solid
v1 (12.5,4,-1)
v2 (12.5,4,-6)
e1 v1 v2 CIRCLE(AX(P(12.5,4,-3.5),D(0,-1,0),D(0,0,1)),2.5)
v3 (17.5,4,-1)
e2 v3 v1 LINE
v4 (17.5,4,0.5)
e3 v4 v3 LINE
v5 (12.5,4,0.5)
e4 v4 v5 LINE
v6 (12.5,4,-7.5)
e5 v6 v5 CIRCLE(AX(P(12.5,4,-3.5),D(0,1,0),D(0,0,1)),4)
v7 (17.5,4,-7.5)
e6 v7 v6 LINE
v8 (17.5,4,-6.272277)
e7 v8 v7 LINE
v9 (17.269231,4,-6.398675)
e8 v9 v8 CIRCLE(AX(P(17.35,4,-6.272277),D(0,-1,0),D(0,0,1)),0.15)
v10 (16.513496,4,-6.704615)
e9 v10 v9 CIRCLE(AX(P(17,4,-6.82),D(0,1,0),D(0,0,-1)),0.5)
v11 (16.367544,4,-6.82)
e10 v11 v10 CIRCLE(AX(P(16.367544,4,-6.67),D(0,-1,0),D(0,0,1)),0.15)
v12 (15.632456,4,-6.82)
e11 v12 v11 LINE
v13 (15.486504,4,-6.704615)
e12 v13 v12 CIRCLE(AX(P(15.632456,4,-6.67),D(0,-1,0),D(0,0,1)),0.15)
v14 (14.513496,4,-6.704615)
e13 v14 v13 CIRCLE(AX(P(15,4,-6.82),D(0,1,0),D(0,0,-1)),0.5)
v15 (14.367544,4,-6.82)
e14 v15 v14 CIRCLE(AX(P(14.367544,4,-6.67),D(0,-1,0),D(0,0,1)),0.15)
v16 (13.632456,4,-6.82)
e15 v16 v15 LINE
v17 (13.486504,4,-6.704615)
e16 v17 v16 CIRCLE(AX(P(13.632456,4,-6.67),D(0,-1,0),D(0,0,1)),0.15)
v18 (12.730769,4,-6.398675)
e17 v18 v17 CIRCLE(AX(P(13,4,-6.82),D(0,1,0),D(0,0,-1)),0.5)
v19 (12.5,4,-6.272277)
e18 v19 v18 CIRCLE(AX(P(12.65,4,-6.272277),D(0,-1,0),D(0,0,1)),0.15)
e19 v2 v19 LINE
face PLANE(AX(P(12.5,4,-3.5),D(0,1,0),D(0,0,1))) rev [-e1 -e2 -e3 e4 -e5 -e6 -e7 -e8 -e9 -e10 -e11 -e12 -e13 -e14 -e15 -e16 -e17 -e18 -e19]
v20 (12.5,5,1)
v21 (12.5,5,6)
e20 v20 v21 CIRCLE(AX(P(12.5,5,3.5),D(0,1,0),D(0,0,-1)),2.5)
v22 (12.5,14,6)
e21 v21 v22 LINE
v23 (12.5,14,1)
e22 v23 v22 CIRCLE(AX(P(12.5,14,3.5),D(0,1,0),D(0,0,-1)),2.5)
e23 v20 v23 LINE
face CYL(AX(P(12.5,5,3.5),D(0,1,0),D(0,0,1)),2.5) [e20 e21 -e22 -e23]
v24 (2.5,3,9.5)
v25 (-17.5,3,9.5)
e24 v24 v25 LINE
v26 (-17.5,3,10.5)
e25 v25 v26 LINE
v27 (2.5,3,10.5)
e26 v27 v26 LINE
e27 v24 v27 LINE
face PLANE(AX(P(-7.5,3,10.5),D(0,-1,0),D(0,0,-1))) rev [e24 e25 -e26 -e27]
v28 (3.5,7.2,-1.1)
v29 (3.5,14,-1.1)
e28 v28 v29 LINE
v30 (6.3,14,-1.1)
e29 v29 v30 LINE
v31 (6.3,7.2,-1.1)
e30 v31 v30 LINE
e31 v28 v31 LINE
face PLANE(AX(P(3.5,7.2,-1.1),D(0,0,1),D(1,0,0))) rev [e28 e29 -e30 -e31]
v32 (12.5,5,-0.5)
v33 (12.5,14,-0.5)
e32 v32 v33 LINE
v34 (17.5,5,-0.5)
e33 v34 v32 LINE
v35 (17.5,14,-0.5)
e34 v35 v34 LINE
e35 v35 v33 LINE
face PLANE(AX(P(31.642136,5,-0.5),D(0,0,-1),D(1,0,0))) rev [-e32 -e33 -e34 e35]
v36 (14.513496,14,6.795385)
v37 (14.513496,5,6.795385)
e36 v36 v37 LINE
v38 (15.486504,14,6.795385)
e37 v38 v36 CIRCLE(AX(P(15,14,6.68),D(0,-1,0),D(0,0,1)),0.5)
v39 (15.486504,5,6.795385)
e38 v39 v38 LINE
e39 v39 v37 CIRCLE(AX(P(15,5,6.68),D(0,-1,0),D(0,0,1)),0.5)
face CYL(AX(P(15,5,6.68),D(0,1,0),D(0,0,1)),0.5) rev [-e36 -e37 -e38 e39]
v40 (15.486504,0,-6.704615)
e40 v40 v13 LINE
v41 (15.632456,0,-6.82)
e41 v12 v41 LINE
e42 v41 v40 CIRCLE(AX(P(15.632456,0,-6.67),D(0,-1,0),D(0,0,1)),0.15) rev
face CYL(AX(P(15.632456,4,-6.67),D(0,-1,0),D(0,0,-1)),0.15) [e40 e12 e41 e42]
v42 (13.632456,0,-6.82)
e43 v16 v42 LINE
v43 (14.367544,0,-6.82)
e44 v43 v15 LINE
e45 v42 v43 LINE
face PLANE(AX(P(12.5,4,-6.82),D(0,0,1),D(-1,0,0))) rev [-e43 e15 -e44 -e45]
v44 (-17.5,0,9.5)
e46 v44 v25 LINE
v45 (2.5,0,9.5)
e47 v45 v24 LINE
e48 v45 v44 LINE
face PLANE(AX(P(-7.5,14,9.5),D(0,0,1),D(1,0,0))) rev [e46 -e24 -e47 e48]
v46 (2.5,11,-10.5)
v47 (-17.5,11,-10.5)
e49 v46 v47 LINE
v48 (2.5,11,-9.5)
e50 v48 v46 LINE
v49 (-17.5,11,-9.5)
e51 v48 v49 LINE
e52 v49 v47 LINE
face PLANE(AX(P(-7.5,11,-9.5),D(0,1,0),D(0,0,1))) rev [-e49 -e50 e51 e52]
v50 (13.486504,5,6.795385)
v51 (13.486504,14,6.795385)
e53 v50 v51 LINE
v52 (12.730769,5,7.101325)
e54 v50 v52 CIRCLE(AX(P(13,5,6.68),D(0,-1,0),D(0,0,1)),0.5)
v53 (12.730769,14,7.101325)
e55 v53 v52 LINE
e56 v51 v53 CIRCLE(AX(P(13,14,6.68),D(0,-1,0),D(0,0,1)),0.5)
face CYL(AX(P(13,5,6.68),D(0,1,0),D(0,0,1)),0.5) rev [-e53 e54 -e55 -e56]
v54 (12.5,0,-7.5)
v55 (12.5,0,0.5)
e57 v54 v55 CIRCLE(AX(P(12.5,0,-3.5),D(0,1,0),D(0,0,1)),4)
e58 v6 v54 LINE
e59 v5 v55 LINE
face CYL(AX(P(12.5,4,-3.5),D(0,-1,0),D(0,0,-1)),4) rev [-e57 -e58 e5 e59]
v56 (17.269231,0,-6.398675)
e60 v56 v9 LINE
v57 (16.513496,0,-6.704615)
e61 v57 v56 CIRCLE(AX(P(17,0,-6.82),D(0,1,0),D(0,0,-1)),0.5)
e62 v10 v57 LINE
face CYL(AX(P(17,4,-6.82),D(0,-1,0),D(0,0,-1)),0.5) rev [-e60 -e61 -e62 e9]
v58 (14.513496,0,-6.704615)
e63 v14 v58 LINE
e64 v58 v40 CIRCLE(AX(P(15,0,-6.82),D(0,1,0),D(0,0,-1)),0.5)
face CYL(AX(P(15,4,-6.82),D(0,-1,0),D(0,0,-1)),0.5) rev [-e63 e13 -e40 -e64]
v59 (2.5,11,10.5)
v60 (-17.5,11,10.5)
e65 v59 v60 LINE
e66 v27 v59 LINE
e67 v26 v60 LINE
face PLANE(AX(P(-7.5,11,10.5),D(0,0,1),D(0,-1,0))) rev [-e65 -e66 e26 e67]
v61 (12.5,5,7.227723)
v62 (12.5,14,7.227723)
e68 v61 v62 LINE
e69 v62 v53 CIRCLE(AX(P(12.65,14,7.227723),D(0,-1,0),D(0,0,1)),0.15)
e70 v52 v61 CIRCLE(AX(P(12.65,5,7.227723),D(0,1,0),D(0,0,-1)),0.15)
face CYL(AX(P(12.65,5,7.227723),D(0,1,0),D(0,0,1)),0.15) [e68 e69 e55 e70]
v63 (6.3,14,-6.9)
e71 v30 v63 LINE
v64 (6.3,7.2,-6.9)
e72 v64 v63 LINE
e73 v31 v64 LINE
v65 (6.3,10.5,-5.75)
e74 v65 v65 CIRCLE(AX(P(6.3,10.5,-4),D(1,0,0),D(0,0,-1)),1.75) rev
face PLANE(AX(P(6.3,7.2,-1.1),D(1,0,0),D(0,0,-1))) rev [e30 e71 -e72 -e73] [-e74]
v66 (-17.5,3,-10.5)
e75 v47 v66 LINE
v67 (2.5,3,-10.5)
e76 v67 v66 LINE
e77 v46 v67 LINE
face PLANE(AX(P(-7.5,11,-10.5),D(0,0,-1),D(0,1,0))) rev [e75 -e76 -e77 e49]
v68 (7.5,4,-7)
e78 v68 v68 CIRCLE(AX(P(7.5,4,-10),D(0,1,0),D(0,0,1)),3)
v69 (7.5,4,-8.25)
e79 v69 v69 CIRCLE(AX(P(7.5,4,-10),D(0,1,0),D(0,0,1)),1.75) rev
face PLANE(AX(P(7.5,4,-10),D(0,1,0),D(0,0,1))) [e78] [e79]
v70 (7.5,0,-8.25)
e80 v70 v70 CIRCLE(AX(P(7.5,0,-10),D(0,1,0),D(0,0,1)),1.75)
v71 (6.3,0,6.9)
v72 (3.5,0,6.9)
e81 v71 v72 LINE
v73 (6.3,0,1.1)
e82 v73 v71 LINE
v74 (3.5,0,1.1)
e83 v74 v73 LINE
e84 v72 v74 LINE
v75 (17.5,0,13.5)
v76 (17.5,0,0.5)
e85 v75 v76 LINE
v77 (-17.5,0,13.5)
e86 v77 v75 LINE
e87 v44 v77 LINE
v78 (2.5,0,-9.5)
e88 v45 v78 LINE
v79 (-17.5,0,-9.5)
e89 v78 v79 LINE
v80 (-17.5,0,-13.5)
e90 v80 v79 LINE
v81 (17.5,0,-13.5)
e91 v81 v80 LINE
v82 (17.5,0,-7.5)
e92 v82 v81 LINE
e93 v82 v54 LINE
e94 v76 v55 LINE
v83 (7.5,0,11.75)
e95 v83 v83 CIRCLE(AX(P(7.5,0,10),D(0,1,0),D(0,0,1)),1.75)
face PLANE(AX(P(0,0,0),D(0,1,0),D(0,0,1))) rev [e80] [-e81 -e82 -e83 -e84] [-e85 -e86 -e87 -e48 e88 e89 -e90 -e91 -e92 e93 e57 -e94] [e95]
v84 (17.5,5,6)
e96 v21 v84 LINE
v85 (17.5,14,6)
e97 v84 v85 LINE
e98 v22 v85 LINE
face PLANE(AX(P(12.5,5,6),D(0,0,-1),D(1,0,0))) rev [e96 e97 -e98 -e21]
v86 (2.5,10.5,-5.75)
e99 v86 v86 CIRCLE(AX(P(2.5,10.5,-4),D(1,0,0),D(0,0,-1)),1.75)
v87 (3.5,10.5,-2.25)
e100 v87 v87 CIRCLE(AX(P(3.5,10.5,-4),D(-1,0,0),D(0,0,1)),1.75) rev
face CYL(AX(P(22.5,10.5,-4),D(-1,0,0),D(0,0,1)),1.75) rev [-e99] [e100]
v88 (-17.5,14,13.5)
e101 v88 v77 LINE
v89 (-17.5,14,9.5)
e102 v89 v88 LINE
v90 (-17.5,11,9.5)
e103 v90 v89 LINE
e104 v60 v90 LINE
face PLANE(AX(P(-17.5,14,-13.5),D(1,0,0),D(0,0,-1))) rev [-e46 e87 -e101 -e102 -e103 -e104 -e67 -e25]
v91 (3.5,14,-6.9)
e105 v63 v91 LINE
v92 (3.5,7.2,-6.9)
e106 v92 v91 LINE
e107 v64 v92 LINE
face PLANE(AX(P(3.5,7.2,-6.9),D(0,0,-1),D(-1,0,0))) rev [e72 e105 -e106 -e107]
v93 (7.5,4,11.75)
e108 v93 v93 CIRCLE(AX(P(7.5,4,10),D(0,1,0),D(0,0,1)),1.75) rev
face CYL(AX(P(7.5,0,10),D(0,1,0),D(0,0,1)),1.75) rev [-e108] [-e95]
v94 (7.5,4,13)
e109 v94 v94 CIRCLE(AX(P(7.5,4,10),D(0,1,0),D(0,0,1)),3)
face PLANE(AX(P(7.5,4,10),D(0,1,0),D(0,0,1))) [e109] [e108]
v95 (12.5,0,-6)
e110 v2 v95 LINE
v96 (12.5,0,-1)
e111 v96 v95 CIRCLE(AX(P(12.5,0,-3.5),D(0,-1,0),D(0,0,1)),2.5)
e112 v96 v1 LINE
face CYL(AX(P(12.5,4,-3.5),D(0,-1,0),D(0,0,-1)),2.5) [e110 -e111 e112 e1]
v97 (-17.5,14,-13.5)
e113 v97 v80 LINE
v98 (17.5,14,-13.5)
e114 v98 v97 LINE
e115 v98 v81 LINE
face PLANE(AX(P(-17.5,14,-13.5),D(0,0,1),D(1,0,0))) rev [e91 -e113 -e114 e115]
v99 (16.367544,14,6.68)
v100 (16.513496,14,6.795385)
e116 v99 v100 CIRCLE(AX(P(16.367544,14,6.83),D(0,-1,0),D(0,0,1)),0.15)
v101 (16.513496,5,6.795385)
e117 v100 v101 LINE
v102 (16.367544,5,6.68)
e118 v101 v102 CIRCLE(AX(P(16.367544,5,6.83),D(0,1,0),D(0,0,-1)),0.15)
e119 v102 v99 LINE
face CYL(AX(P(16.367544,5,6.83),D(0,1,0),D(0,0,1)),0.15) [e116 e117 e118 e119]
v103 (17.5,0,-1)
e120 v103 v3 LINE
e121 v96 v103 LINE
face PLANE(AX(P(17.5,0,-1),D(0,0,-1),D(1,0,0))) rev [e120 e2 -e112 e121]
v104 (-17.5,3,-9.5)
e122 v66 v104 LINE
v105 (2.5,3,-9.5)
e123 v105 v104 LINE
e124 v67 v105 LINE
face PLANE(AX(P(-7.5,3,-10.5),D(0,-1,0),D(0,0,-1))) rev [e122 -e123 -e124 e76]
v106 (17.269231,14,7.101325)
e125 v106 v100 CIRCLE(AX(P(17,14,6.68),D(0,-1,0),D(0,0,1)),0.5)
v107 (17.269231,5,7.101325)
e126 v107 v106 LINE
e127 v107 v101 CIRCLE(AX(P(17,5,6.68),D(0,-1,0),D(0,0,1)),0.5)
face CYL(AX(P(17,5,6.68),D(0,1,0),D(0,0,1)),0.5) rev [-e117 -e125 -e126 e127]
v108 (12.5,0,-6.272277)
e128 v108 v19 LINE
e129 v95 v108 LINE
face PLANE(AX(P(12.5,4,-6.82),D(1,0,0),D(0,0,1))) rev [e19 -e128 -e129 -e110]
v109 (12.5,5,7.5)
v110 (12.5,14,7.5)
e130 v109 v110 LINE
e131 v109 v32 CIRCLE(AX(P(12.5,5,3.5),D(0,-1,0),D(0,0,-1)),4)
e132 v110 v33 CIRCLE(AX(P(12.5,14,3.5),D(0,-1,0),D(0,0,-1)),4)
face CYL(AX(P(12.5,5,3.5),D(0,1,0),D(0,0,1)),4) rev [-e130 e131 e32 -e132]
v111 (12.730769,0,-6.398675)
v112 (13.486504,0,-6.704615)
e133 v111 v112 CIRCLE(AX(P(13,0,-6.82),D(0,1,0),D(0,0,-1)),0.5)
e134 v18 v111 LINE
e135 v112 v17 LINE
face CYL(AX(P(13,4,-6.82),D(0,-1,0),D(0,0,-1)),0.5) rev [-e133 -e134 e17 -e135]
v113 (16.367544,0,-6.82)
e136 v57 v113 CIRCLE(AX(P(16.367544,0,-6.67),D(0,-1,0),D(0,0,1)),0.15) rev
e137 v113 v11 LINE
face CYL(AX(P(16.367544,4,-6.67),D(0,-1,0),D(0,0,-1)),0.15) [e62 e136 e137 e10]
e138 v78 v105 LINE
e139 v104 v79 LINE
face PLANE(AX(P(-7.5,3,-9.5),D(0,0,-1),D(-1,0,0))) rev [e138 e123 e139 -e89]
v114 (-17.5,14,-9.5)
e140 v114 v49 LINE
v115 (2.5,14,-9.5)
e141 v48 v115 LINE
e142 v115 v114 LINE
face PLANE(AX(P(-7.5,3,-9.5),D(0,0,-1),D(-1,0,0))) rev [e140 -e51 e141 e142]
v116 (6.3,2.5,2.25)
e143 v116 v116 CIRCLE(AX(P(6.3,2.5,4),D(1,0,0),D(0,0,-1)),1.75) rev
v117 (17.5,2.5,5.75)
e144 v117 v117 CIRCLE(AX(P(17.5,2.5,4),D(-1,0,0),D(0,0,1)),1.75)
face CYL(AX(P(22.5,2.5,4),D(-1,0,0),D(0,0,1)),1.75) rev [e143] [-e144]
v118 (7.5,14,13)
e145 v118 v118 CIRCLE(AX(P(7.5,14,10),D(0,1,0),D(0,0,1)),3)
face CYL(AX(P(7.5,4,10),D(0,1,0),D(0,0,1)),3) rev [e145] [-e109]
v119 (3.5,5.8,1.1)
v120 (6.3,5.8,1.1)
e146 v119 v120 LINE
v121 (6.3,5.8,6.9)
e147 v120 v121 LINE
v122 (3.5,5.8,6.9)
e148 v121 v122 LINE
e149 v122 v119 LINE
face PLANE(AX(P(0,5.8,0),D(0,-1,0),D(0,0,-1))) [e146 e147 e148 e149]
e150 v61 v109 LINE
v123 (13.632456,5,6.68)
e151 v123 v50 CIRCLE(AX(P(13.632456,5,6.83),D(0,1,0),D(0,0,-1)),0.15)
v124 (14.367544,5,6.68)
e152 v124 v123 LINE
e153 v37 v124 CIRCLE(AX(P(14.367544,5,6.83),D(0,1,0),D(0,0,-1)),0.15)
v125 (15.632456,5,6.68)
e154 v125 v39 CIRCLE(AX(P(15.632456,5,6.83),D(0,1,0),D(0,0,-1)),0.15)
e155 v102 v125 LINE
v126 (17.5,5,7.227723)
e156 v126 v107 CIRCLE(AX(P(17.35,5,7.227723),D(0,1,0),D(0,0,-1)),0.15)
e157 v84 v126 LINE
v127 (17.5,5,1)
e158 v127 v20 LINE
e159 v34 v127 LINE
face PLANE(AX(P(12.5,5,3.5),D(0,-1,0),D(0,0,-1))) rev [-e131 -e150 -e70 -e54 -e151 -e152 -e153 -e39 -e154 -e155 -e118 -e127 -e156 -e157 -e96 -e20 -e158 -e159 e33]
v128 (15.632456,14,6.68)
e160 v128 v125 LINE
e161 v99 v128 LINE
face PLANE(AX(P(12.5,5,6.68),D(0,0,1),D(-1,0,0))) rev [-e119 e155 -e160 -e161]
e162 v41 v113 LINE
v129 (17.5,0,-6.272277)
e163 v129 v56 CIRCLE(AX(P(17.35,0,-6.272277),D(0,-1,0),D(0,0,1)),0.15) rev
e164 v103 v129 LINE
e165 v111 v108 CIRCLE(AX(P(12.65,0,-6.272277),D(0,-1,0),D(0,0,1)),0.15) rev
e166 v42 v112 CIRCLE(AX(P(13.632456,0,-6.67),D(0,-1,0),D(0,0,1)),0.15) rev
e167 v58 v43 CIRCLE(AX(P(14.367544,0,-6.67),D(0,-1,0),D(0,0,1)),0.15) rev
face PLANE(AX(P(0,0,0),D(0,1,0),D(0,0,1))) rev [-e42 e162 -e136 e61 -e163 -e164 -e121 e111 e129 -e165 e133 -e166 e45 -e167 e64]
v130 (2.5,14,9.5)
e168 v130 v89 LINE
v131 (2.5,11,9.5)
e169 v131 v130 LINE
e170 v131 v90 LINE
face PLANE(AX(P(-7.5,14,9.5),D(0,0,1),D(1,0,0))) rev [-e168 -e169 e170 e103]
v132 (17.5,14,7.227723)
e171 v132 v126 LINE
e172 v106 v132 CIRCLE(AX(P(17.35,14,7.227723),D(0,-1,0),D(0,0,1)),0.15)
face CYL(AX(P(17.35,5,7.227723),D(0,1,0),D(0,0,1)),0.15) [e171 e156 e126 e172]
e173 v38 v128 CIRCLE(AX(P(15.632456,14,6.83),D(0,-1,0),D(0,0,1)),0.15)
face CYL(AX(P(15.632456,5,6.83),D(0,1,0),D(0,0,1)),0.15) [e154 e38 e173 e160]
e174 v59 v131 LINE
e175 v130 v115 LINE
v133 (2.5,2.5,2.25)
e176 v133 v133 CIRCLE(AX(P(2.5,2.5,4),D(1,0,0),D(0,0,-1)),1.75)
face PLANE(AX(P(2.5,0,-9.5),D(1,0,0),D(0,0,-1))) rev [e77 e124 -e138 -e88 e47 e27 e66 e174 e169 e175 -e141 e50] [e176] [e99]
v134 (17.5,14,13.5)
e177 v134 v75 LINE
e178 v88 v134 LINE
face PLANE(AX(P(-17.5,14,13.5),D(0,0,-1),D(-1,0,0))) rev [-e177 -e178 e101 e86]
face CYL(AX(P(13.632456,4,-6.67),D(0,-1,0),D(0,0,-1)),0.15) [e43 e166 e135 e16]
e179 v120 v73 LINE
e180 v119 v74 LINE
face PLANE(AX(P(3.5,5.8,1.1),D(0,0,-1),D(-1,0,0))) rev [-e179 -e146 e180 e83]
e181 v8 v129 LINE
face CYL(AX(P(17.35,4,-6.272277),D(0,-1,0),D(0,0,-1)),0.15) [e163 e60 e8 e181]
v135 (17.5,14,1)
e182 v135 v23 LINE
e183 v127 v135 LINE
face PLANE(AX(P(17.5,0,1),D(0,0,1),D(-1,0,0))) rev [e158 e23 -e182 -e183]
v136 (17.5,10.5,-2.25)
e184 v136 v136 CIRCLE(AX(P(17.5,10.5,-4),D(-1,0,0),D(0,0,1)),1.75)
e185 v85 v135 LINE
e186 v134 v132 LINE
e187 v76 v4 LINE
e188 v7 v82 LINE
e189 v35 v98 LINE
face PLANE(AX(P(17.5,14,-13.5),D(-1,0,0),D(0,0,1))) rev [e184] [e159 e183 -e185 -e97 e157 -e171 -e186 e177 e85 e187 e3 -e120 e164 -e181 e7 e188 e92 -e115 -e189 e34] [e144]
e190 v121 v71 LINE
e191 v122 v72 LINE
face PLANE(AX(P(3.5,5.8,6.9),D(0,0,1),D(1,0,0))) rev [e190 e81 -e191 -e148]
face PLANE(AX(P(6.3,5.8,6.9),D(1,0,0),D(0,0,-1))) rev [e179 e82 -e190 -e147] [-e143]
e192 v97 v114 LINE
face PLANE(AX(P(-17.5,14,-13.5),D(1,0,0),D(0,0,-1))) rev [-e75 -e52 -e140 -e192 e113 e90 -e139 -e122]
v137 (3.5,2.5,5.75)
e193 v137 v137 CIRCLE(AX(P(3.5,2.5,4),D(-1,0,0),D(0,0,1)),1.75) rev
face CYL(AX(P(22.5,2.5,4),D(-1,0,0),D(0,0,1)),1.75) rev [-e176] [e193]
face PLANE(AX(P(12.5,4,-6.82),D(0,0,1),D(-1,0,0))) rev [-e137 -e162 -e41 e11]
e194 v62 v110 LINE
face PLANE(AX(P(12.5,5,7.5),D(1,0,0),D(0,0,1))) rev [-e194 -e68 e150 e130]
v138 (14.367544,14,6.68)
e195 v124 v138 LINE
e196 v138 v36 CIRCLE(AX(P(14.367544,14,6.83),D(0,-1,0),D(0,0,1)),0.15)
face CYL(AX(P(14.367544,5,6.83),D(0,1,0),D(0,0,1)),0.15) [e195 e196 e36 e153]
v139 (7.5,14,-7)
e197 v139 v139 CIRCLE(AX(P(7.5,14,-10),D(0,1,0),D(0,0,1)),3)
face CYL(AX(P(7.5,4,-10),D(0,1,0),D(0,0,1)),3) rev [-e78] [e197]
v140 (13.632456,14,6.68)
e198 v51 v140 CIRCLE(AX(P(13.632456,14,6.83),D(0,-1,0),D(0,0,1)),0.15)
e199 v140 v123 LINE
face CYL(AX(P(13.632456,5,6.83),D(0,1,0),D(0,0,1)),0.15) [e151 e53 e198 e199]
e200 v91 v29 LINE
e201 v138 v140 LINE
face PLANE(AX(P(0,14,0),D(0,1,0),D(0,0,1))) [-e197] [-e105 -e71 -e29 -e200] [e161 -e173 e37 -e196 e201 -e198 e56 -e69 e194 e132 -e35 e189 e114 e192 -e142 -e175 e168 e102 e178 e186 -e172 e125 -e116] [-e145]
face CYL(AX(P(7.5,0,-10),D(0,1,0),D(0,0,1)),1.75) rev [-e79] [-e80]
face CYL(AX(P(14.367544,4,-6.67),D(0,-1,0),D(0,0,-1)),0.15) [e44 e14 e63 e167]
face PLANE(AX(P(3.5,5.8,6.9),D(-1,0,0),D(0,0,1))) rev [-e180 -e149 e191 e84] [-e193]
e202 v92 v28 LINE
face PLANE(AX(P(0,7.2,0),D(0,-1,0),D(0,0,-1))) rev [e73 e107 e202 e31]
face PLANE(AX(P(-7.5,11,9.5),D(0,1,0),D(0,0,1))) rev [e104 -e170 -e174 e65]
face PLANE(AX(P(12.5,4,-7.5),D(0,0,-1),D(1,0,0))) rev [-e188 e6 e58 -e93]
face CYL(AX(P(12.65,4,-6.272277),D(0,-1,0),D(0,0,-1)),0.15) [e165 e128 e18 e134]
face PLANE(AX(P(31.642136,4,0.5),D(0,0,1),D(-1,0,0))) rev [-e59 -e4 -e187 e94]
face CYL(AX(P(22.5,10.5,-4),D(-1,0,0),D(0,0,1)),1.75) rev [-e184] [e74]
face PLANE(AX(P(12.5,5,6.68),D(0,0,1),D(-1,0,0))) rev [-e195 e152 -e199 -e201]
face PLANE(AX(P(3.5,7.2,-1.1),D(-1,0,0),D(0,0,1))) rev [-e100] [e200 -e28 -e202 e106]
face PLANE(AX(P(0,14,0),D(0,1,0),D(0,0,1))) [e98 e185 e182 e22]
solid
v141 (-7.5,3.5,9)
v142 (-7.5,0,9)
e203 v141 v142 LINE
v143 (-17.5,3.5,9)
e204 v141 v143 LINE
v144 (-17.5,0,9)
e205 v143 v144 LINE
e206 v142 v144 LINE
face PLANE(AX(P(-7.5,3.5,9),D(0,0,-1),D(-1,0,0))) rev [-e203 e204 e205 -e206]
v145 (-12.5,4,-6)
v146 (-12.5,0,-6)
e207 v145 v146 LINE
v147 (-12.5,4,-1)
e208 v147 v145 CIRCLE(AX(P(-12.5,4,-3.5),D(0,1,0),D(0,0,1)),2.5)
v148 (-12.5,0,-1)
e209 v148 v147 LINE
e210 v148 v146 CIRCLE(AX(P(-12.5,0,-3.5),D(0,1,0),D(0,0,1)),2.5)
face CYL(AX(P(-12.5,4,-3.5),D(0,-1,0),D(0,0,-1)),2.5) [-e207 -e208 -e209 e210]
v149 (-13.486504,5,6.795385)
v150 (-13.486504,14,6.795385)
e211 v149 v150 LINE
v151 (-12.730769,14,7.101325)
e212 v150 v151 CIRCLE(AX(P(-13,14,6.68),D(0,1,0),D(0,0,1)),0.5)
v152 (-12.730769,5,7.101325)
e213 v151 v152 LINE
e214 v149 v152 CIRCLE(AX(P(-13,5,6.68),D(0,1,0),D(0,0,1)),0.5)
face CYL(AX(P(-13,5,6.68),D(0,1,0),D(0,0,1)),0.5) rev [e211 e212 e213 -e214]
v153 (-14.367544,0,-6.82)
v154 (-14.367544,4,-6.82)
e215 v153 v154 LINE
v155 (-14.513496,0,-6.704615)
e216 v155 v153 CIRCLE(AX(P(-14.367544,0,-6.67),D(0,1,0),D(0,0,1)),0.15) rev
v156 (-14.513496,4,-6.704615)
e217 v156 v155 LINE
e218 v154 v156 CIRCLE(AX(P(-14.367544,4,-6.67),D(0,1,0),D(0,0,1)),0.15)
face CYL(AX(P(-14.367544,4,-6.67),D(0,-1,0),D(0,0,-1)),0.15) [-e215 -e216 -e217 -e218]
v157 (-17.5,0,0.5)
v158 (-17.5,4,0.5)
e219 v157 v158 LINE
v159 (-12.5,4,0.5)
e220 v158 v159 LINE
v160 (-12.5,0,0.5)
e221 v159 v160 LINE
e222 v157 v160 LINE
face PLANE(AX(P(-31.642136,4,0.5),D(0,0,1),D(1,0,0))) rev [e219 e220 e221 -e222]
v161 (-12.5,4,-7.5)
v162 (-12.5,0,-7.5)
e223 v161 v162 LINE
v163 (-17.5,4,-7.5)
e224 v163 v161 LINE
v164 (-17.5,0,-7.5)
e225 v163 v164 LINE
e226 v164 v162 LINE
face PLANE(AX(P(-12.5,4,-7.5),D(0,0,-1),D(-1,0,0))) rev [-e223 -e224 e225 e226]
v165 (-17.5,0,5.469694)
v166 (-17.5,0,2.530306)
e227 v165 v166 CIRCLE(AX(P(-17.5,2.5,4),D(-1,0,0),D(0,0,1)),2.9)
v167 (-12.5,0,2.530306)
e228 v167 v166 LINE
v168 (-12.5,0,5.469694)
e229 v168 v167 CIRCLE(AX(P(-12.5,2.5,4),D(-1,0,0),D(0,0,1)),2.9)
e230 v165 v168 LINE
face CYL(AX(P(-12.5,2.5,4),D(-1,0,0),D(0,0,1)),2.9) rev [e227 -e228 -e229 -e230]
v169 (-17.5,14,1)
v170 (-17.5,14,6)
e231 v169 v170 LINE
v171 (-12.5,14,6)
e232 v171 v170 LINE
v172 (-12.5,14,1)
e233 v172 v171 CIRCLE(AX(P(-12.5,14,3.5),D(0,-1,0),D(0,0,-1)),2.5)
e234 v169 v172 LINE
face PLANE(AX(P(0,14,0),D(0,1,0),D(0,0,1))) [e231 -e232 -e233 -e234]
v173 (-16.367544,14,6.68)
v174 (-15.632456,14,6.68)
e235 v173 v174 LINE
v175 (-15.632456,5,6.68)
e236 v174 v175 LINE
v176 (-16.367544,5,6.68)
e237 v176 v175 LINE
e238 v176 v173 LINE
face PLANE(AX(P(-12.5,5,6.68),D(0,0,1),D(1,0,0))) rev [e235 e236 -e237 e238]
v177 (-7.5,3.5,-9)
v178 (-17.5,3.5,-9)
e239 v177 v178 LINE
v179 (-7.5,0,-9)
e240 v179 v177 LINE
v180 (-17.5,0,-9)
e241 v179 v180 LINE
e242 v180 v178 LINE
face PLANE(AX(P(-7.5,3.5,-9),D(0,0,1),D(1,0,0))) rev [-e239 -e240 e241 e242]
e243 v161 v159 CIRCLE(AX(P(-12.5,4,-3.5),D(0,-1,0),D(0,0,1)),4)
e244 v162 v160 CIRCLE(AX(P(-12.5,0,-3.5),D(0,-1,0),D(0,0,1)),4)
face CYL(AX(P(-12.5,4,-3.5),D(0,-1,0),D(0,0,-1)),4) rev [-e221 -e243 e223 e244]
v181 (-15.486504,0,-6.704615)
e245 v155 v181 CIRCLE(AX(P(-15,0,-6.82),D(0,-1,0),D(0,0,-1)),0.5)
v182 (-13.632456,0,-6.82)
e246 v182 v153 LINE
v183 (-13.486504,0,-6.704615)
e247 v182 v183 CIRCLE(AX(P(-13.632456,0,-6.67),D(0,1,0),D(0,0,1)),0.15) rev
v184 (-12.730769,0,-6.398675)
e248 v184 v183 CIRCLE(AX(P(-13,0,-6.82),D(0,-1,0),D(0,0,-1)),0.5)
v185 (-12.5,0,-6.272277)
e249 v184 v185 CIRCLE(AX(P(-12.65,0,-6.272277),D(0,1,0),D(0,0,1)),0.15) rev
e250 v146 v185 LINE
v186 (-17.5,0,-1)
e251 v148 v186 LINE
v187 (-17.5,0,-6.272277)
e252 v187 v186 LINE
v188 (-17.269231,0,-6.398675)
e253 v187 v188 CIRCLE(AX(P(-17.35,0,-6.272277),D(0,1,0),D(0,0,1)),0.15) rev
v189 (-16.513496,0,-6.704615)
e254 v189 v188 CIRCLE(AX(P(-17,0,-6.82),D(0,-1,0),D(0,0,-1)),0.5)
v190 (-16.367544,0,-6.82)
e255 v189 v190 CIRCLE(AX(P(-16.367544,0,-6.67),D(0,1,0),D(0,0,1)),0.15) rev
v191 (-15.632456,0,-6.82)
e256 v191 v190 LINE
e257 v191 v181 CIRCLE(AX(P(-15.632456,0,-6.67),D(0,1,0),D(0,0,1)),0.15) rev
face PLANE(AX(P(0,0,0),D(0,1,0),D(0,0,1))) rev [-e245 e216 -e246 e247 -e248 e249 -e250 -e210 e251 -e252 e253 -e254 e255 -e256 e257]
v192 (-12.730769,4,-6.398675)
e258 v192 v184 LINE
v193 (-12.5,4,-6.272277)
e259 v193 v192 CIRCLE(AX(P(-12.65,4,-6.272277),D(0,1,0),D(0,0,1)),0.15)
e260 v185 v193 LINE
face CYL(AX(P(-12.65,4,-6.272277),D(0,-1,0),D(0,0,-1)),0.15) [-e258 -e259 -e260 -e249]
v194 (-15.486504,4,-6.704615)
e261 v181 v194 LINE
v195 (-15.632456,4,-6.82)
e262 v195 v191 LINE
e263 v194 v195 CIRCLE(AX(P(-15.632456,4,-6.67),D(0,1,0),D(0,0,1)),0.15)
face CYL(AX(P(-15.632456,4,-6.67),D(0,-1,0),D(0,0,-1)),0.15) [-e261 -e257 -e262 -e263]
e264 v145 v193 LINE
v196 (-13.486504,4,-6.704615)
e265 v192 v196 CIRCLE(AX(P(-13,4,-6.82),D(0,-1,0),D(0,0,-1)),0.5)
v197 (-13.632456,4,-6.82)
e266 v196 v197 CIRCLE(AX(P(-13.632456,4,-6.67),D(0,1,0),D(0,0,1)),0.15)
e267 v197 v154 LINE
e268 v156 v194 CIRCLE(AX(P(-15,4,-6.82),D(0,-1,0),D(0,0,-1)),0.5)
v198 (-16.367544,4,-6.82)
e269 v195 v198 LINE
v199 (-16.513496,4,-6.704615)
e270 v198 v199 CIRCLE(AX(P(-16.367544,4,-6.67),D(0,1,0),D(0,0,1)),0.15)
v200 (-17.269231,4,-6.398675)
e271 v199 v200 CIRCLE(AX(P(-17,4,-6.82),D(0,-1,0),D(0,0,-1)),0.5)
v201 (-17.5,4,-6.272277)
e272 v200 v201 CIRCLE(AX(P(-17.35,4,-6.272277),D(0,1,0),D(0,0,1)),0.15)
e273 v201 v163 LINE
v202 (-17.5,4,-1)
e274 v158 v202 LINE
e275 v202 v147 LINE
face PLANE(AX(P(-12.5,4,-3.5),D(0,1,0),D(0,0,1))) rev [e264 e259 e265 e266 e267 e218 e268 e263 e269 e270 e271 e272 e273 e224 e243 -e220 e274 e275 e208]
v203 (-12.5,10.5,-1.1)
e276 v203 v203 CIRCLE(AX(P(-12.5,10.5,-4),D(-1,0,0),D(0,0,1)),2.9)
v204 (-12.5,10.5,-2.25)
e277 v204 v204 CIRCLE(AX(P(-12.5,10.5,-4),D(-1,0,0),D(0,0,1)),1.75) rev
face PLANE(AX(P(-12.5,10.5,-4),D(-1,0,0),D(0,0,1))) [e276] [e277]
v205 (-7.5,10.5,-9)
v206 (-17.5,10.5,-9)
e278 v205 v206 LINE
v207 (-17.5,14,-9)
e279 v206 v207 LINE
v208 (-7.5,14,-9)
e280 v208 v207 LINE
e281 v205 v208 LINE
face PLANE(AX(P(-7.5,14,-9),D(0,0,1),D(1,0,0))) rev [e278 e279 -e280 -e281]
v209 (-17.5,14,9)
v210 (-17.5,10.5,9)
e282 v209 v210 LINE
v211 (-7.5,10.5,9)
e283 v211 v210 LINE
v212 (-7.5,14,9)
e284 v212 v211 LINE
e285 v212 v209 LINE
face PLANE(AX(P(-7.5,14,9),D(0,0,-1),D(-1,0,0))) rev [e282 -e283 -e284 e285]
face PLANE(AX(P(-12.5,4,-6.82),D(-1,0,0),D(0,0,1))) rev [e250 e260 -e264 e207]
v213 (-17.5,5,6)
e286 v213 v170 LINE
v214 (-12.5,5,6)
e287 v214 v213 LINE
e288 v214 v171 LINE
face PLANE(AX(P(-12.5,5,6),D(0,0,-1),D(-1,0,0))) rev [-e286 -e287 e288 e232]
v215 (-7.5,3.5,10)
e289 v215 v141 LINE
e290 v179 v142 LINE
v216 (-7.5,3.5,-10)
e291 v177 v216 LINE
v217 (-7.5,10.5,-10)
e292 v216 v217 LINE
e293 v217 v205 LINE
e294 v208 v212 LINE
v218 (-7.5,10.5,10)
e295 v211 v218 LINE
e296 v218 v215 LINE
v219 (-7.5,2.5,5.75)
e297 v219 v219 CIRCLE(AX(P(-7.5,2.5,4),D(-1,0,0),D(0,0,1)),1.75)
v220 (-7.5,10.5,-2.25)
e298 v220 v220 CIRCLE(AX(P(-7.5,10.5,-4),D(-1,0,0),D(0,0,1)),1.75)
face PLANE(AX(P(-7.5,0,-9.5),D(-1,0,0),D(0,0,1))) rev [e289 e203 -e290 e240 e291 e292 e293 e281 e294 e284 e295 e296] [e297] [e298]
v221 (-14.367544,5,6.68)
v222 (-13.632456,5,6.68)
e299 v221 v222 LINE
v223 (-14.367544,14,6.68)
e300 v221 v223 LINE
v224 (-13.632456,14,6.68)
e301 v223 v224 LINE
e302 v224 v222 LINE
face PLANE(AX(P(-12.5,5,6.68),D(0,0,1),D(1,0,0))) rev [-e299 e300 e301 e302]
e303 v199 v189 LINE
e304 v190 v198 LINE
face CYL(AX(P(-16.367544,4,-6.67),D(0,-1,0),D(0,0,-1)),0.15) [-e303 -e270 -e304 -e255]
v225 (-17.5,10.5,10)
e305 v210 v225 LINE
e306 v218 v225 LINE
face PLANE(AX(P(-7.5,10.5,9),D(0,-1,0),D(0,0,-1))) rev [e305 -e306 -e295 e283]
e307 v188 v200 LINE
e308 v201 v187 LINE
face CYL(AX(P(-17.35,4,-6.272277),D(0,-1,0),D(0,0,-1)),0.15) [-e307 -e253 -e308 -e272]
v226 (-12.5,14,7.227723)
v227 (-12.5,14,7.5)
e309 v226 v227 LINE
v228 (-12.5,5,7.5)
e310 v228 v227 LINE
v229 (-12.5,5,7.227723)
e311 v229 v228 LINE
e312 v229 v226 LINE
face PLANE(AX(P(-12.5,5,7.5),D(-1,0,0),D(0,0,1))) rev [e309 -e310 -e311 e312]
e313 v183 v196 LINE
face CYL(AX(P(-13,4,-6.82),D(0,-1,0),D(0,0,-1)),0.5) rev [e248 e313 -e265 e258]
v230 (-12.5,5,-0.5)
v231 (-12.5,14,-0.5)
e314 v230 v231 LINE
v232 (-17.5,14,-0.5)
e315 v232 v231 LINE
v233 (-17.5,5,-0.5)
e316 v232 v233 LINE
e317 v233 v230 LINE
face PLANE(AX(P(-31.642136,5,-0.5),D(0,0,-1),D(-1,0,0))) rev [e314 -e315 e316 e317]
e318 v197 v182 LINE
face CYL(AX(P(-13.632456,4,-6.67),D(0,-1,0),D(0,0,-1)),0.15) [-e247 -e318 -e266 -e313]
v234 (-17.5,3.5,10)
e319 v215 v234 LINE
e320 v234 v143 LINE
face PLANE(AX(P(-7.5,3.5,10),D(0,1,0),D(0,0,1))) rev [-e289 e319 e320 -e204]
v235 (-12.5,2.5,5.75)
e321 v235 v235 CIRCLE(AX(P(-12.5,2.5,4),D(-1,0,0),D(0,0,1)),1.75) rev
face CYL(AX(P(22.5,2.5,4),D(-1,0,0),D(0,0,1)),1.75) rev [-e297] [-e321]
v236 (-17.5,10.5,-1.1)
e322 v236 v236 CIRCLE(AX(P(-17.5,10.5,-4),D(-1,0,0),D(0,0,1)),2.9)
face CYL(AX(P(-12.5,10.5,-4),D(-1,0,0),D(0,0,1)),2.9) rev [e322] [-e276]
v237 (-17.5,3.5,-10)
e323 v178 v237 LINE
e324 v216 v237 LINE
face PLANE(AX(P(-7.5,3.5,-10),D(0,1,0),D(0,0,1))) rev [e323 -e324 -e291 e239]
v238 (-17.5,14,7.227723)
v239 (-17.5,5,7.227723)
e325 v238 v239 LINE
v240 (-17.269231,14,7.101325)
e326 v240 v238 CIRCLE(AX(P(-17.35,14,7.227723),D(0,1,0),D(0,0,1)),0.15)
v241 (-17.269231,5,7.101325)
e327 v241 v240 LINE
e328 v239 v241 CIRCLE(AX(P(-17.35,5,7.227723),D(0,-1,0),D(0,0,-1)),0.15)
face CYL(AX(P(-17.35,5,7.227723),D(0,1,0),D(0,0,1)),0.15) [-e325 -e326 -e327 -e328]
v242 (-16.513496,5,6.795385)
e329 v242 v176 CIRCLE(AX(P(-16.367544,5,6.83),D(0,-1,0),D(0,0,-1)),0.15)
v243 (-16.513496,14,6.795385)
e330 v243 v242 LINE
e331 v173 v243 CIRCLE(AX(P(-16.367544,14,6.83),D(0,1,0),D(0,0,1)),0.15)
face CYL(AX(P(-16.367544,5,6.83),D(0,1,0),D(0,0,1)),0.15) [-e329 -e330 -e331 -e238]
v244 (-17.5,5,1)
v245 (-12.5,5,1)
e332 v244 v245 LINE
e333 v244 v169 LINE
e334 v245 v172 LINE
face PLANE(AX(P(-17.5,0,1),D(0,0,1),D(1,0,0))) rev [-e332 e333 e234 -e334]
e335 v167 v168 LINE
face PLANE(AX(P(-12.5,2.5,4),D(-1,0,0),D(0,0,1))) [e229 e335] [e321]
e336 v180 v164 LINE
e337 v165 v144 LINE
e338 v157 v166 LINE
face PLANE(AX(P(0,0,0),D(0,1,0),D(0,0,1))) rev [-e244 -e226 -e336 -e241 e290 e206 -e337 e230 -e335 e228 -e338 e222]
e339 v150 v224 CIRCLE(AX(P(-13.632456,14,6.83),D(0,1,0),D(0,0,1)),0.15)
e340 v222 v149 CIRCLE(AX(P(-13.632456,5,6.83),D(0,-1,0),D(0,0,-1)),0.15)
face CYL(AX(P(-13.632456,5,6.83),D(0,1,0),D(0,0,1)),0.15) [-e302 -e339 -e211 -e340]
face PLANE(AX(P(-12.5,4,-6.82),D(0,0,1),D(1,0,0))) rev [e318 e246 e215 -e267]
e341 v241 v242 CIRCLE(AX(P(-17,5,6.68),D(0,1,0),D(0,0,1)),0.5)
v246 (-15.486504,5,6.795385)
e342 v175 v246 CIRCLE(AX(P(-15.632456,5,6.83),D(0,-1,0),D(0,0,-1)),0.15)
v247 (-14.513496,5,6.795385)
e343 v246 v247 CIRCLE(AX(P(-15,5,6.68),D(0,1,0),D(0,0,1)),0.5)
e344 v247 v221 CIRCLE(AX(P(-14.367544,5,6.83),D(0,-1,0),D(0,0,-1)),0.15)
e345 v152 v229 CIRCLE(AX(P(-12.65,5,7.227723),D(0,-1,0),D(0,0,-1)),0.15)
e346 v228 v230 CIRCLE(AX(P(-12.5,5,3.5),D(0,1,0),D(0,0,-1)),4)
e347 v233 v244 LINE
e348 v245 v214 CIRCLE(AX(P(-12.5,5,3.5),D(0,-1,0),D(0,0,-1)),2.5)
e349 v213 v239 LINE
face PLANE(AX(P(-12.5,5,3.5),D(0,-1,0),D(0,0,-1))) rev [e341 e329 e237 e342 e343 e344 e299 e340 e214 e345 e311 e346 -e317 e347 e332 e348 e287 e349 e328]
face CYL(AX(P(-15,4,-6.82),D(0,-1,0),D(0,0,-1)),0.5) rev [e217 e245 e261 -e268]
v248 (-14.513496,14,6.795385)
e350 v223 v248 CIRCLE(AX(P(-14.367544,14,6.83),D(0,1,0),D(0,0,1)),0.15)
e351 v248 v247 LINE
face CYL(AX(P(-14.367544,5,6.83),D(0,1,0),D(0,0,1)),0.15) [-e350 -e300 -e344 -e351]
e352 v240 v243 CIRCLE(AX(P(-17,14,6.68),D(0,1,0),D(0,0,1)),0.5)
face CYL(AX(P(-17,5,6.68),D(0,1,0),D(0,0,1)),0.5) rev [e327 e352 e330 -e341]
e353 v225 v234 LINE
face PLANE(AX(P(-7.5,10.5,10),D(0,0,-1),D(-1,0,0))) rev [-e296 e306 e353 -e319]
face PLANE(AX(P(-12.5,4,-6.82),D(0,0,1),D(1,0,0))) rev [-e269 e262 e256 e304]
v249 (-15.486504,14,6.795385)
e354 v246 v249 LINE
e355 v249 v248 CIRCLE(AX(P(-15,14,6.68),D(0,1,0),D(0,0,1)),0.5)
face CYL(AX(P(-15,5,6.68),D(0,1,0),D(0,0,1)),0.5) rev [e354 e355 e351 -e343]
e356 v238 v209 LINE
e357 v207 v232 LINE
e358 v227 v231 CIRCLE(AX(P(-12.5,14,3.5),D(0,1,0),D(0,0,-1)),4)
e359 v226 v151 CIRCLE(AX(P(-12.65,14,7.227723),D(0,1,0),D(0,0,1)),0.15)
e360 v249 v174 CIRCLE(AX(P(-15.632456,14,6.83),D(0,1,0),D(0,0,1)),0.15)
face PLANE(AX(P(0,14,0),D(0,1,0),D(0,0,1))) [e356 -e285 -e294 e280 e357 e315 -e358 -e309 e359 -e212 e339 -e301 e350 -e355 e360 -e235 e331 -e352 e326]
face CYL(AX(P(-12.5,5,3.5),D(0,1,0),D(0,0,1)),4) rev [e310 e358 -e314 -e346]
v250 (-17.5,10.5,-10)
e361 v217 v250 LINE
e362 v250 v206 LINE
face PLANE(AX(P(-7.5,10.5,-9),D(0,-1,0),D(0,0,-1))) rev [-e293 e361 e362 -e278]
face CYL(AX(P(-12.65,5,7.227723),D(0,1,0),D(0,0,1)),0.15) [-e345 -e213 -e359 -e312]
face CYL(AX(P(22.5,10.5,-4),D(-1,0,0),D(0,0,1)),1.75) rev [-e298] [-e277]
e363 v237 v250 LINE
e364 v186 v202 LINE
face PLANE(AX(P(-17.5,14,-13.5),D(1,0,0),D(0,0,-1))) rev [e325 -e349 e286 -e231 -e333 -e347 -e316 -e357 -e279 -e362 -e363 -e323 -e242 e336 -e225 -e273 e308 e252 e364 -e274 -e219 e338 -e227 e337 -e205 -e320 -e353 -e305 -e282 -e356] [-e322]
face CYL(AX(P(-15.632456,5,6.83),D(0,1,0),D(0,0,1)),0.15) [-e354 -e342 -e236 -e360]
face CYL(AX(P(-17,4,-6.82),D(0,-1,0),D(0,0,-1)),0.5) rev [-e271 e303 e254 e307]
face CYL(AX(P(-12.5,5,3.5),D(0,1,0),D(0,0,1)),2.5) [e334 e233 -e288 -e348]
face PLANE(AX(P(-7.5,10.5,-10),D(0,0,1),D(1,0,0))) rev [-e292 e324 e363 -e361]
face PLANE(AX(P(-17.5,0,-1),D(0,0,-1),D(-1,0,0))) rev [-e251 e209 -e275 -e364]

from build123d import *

# Parameters (mm, degrees)
SKETCH1_W                = 35
SKETCH1_H                = 27
BOSS_EXTRUDE1_DEPTH      = 14
SKETCH2_R                = 1.75
CUT_EXTRUDE1_DEPTH       = 14
SKETCH9_R                = 3
CUT_EXTRUDE7_DEPTH       = 10
CUT_EXTRUDE10_DEPTH      = 10
CUT_EXTRUDE11_DEPTH      = 27.162950904
CUT_EXTRUDE11_DEPTH_BACK = 27.162950904
SKETCH13_W               = 10
SKETCH13_H               = 19
SKETCH31_W               = 1
SKETCH31_H               = 8
CUT_EXTRUDE21_DEPTH      = 10
SKETCH15_W               = 5
SKETCH15_H               = 2
CUT_EXTRUDE12_DEPTH      = 27.162950904
CUT_EXTRUDE13_DEPTH      = 9
SKETCH18_R               = 0.5
CUT_EXTRUDE15_DEPTH      = 9
LPATTERN2_COUNT          = 3
LPATTERN2_PITCH          = 2
FILLET1_R                = 0.15
CUT_EXTRUDE14_DEPTH      = 4
SKETCH19_R               = 0.5
CUT_EXTRUDE16_DEPTH      = 4
LPATTERN3_COUNT          = 3
LPATTERN3_PITCH          = 2
FILLET2_START            = -1
FILLET2_DEPTH            = 5
SKETCH20_R               = 1.75
CUT_EXTRUDE17_DEPTH      = 40
SKETCH26_R               = 2.9
CUT_EXTRUDE18_DEPTH      = 5
BOSS_EXTRUDE3_DEPTH      = 5
MIRROR1_START            = 5
MIRROR1_DEPTH            = 9
MIRROR1_2_DEPTH          = 4
SKETCH29_W               = 2.8
SKETCH29_H               = 5.8
CUT_EXTRUDE19_DEPTH      = 6.8
SKETCH30_W               = 2.8
SKETCH30_H               = 5.8
CUT_EXTRUDE20_DEPTH      = 5.8


with BuildPart() as part:
    # Sketch1 → Boss-Extrude1 (new body)
    with BuildSketch(Plane(origin=(0, 0, 0), x_dir=(1, 0, 0), z_dir=(0, 1, 0))):
        Rectangle(SKETCH1_W, SKETCH1_H)
    extrude(amount=BOSS_EXTRUDE1_DEPTH)

    # Sketch2 → Cut-Extrude1 (cut)
    with BuildSketch(Plane(origin=(0, 14, 0), x_dir=(1, 0, 0), z_dir=(0, 1, 0))):
        with Locations(Location((7.5, -10, 0), (0, 0, 270))):
            Circle(SKETCH2_R)
        with Locations(Location((7.5, 10, 0), (0, 0, 270))):
            Circle(SKETCH2_R)
    extrude(amount=-CUT_EXTRUDE1_DEPTH, mode=Mode.SUBTRACT)

    # Sketch9 → Cut-Extrude7 (cut)
    with BuildSketch(Plane(origin=(0, 14, 0), x_dir=(1, 0, 0), z_dir=(0, 1, 0))):
        with Locations(Location((7.5, 10, 0), (0, 0, 270))):
            Circle(SKETCH9_R)
        with Locations(Location((7.5, -10, 0), (0, 0, 270))):
            Circle(SKETCH9_R)
    extrude(amount=-CUT_EXTRUDE7_DEPTH, mode=Mode.SUBTRACT)

    # Sketch12 → Cut-Extrude10 (cut)
    with BuildSketch(Plane.ZY.offset(17.5)):
        Polygon((-9.5, 14), (-9.5, 11), (-10.5, 11), (-10.5, 3), (-9.5, 3), (-9.5, 0), (-9, 0), (-9, 3.5), (-10, 3.5), (-10, 10.5), (-9, 10.5), (-9, 14), align=None)
        Polygon((10, 10.5), (10, 3.5), (9, 3.5), (9, 0), (9.5, 0), (9.5, 3), (10.5, 3), (10.5, 11), (9.5, 11), (9.5, 14), (9, 14), (9, 10.5), align=None)
    extrude(amount=-CUT_EXTRUDE10_DEPTH, mode=Mode.SUBTRACT)

    # Sketch13 → Cut-Extrude11 (cut, two sides: drawn at the far end of the back side and taken through both)
    with BuildSketch(Plane(origin=(0, 14, 0), x_dir=(1, 0, 0), z_dir=(0, 1, 0)).offset(-CUT_EXTRUDE11_DEPTH_BACK)):
        with Locations((-2.5, 0)):
            Rectangle(SKETCH13_W, SKETCH13_H)
    extrude(amount=CUT_EXTRUDE11_DEPTH + CUT_EXTRUDE11_DEPTH_BACK, mode=Mode.SUBTRACT)

    # Sketch31 → Cut-Extrude21 (cut)
    with BuildSketch(Plane.ZY.offset(7.5)):
        with Locations((-10, 7)):
            Rectangle(SKETCH31_W, SKETCH31_H)
        with Locations((10, 7)):
            Rectangle(SKETCH31_W, SKETCH31_H)
    extrude(amount=-CUT_EXTRUDE21_DEPTH, mode=Mode.SUBTRACT)


with BuildPart() as cut_extrude21_piece_1:
    # of the separate pieces the step leaves, piece 1, a body of its own (cut_extrude21_pieces)
    add(part.part.solids().sort_by_distance((-17.5, 0, -13.5))[0])


with BuildPart() as cut_extrude21_piece_2:
    # of the separate pieces the step leaves, piece 2, a body of its own (cut_extrude21_pieces)
    add(part.part.solids().sort_by_distance((-7.5, 14, 9))[0])

    # Sketch15 → Cut-Extrude12 (cut, through all)
    with BuildSketch(Plane(origin=(0, 14, 0), x_dir=(1, 0, 0), z_dir=(0, 1, 0))):
        with Locations((-15, 0)):
            Rectangle(SKETCH15_W, SKETCH15_H)
    extrude(amount=-CUT_EXTRUDE12_DEPTH, mode=Mode.SUBTRACT)

    # Sketch16 → Cut-Extrude13 (cut)
    with BuildSketch(Plane(origin=(0, 14, 0), x_dir=(1, 0, 0), z_dir=(0, 1, 0))):
        with BuildLine():
            Line((-12.5, -6), (-17.5, -6))
            Line((-17.5, -6), (-17.5, -6.68))
            Line((-17.5, -6.68), (-12.5, -6.68))
            Line((-12.5, -6.68), (-12.5, -7.5))
            ThreePointArc((-12.5, -7.5), (-8.5, -3.5), (-12.5, 0.5))
            Line((-12.5, 0.5), (-12.5, -1))
            ThreePointArc((-12.5, -1), (-10, -3.5), (-12.5, -6))
        make_face()
    extrude(amount=-CUT_EXTRUDE13_DEPTH, mode=Mode.SUBTRACT)

    # Sketch18 → Cut-Extrude15 (cut)
    with BuildSketch(Plane(origin=(0, 14, 0), x_dir=(1, 0, 0), z_dir=(0, 1, 0))):
        with Locations((-13, -6.68)):
            Circle(SKETCH18_R)
    cut_extrude15 = extrude(amount=-CUT_EXTRUDE15_DEPTH, mode=Mode.SUBTRACT)

    # LPattern2: Cut-Extrude15 ×3
    with Locations(*[(-i * LPATTERN2_PITCH, 0, 0) for i in range(1, LPATTERN2_COUNT)]):
        add(cut_extrude15, mode=Mode.SUBTRACT)

    # Fillet1
    fillet1_edges = [cut_extrude21_piece_2.edges().sort_by_distance(p)[0] for p in [
        (-12.5, 9.5, 6.68),
        (-17.5, 9.5, 6.68),
        (-13.5, 9.5, 6.68),
        (-14.5, 9.5, 6.68),
        (-15.5, 9.5, 6.68),
        (-16.5, 9.5, 6.68),
    ]]
    fillet(fillet1_edges, radius=FILLET1_R)

    # Sketch17 → Cut-Extrude14 (cut)
    with BuildSketch(Plane.XZ):
        with BuildLine():
            Line((-12.5, -7.5), (-17.5, -7.5))
            Line((-17.5, -7.5), (-17.5, -6.82))
            Line((-17.5, -6.82), (-12.5, -6.82))
            Line((-12.5, -6.82), (-12.5, -6))
            ThreePointArc((-12.5, -6), (-10, -3.5), (-12.5, -1))
            Line((-12.5, -1), (-12.5, 0.5))
            ThreePointArc((-12.5, 0.5), (-8.5, -3.5), (-12.5, -7.5))
        make_face()
    extrude(amount=-CUT_EXTRUDE14_DEPTH, mode=Mode.SUBTRACT)

    # Sketch19 → Cut-Extrude16 (cut)
    with BuildSketch(Plane.XZ):
        with Locations((-13, -6.82)):
            Circle(SKETCH19_R)
    cut_extrude16 = extrude(amount=-CUT_EXTRUDE16_DEPTH, mode=Mode.SUBTRACT)

    # LPattern3: Cut-Extrude16 ×3
    with Locations(*[(-i * LPATTERN3_PITCH, 0, 0) for i in range(1, LPATTERN3_COUNT)]):
        add(cut_extrude16, mode=Mode.SUBTRACT)

    # Fillet2: read off the stored shape, not the designer's step
    # Fillet2 outline → Fillet2 (cut)
    with BuildSketch(Plane(origin=(0, 0, 0), x_dir=(1, 0, 0), z_dir=(0, 1, 0)).offset(FILLET2_START)):
        with BuildLine():
            Line((-17.5, 6.82), (-17.5, 6.272277442))
            ThreePointArc((-17.5, 6.272277442), (-17.422057669, 6.403836145), (-17.269230769, 6.398674956))
            ThreePointArc((-17.269230769, 6.398674956), (-17.43852901, 6.579807769), (-17.5, 6.82))
        make_face()
        with BuildLine():
            ThreePointArc((-12.5, 6.82), (-12.56147099, 6.579807769), (-12.730769231, 6.398674956))
            ThreePointArc((-12.730769231, 6.398674956), (-12.577942331, 6.403836145), (-12.5, 6.272277442))
            Line((-12.5, 6.272277442), (-12.5, 6.82))
        make_face()
        with BuildLine():
            Line((-13.5, 6.82), (-13.632455532, 6.82))
            ThreePointArc((-13.632455532, 6.82), (-13.539429481, 6.787669681), (-13.486504255, 6.704615385))
            ThreePointArc((-13.486504255, 6.704615385), (-13.496614603, 6.761914407), (-13.5, 6.82))
        make_face()
        with BuildLine():
            ThreePointArc((-14.5, 6.82), (-14.503385397, 6.761914407), (-14.513495745, 6.704615385))
            ThreePointArc((-14.513495745, 6.704615385), (-14.460570519, 6.787669681), (-14.367544468, 6.82))
            Line((-14.367544468, 6.82), (-14.5, 6.82))
        make_face()
        with BuildLine():
            Line((-15.5, 6.82), (-15.632455532, 6.82))
            ThreePointArc((-15.632455532, 6.82), (-15.539429481, 6.787669681), (-15.486504255, 6.704615385))
            ThreePointArc((-15.486504255, 6.704615385), (-15.496614603, 6.761914407), (-15.5, 6.82))
        make_face()
        with BuildLine():
            ThreePointArc((-16.5, 6.82), (-16.503385397, 6.761914407), (-16.513495745, 6.704615385))
            ThreePointArc((-16.513495745, 6.704615385), (-16.460570519, 6.787669681), (-16.367544468, 6.82))
            Line((-16.367544468, 6.82), (-16.5, 6.82))
        make_face()
    extrude(amount=FILLET2_DEPTH, mode=Mode.SUBTRACT)


with BuildPart() as cut_extrude17_tool:
    # Sketch20 → Cut-Extrude17 (new body)
    with BuildSketch(Plane.ZY.offset(17.5)):
        with Locations((-4, 10.5)):
            Circle(SKETCH20_R)
        with Locations((4, 2.5)):
            Circle(SKETCH20_R)
    extrude(amount=-CUT_EXTRUDE17_DEPTH)


with BuildPart() as cut_extrude21_piece_1_1:
    add(cut_extrude21_piece_1.part)

    # Cut-Extrude17: cut by cut_extrude17_tool
    add(cut_extrude17_tool.part, mode=Mode.SUBTRACT)

    # Mirror1: read off the stored shape, not the designer's step
    # Mirror1 outline → Mirror1 (cut)
    with BuildSketch(Plane(origin=(0, 0, 0), x_dir=(1, 0, 0), z_dir=(0, 1, 0)).offset(MIRROR1_START)):
        with BuildLine():
            ThreePointArc((13.486504255, -6.795384615), (13.539429481, -6.712330319), (13.632455532, -6.68))
            Line((13.632455532, -6.68), (14.367544468, -6.68))
            ThreePointArc((14.367544468, -6.68), (14.460570519, -6.712330319), (14.513495745, -6.795384615))
            ThreePointArc((14.513495745, -6.795384615), (15, -7.18), (15.486504255, -6.795384615))
            ThreePointArc((15.486504255, -6.795384615), (15.539429481, -6.712330319), (15.632455532, -6.68))
            Line((15.632455532, -6.68), (16.367544468, -6.68))
            ThreePointArc((16.367544468, -6.68), (16.460570519, -6.712330319), (16.513495745, -6.795384615))
            ThreePointArc((16.513495745, -6.795384615), (16.812378497, -7.143463236), (17.269230769, -7.101325044))
            ThreePointArc((17.269230769, -7.101325044), (17.422057669, -7.096163855), (17.5, -7.227722558))
            Line((17.5, -7.227722558), (17.5, -6))
            Line((17.5, -6), (12.5, -6))
            ThreePointArc((12.5, -6), (10, -3.5), (12.5, -1))
            Line((12.5, -1), (17.5, -1))
            Line((17.5, -1), (17.5, 0.5))
            Line((17.5, 0.5), (12.5, 0.5))
            ThreePointArc((12.5, 0.5), (8.5, -3.5), (12.5, -7.5))
            Line((12.5, -7.5), (12.5, -7.227722558))
            ThreePointArc((12.5, -7.227722558), (12.577942331, -7.096163855), (12.730769231, -7.101325044))
            ThreePointArc((12.730769231, -7.101325044), (13.187621503, -7.143463236), (13.486504255, -6.795384615))
        make_face()
    extrude(amount=MIRROR1_DEPTH, mode=Mode.SUBTRACT)

    # Mirror1 2 outline → Mirror1 2 (cut)
    with BuildSketch(Plane(origin=(0, 0, 0), x_dir=(1, 0, 0), z_dir=(0, 1, 0))):
        with BuildLine():
            ThreePointArc((12.5, 7.5), (8.5, 3.5), (12.5, -0.5))
            Line((12.5, -0.5), (17.5, -0.5))
            Line((17.5, -0.5), (17.5, 1))
            Line((17.5, 1), (12.5, 1))
            ThreePointArc((12.5, 1), (10, 3.5), (12.5, 6))
            Line((12.5, 6), (12.5, 6.272277442))
            ThreePointArc((12.5, 6.272277442), (12.577942331, 6.403836145), (12.730769231, 6.398674956))
            ThreePointArc((12.730769231, 6.398674956), (13.187621503, 6.356536764), (13.486504255, 6.704615385))
            ThreePointArc((13.486504255, 6.704615385), (13.539429481, 6.787669681), (13.632455532, 6.82))
            Line((13.632455532, 6.82), (14.367544468, 6.82))
            ThreePointArc((14.367544468, 6.82), (14.460570519, 6.787669681), (14.513495745, 6.704615385))
            ThreePointArc((14.513495745, 6.704615385), (15, 6.32), (15.486504255, 6.704615385))
            ThreePointArc((15.486504255, 6.704615385), (15.539429481, 6.787669681), (15.632455532, 6.82))
            Line((15.632455532, 6.82), (16.367544468, 6.82))
            ThreePointArc((16.367544468, 6.82), (16.460570519, 6.787669681), (16.513495745, 6.704615385))
            ThreePointArc((16.513495745, 6.704615385), (16.812378497, 6.356536764), (17.269230769, 6.398674956))
            ThreePointArc((17.269230769, 6.398674956), (17.422057669, 6.403836145), (17.5, 6.272277442))
            Line((17.5, 6.272277442), (17.5, 7.5))
            Line((17.5, 7.5), (12.5, 7.5))
        make_face()
    extrude(amount=MIRROR1_2_DEPTH, mode=Mode.SUBTRACT)

    # Sketch29 → Cut-Extrude19 (cut)
    with BuildSketch(Plane(origin=(0, 14, 0), x_dir=(1, 0, 0), z_dir=(0, 1, 0))):
        with Locations((4.9, 4)):
            Rectangle(SKETCH29_W, SKETCH29_H)
    extrude(amount=-CUT_EXTRUDE19_DEPTH, mode=Mode.SUBTRACT)

    # Sketch30 → Cut-Extrude20 (cut)
    with BuildSketch(Plane.XZ):
        with Locations((4.9, 4)):
            Rectangle(SKETCH30_W, SKETCH30_H)
    extrude(amount=-CUT_EXTRUDE20_DEPTH, mode=Mode.SUBTRACT)


with BuildPart() as cut_extrude21_piece_2_1:
    add(cut_extrude21_piece_2.part)

    # Cut-Extrude17: cut by cut_extrude17_tool
    add(cut_extrude17_tool.part, mode=Mode.SUBTRACT)

    # Sketch26 → Cut-Extrude18 (cut)
    with BuildSketch(Plane.ZY.offset(17.5)):
        with Locations((-4, 10.5)):
            Circle(SKETCH26_R)
        with Locations((4, 2.5)):
            Circle(SKETCH26_R)
    extrude(amount=-CUT_EXTRUDE18_DEPTH, mode=Mode.SUBTRACT)

    # Sketch28 → Boss-Extrude3 (add)
    with BuildSketch(Plane.ZY.offset(12.5)):
        Polygon((-1, 14), (-1, 4), (0.5, 4), (0.5, 0), (1, 0), (1, 5), (-0.5, 5), (-0.5, 14), align=None)
    extrude(amount=BOSS_EXTRUDE3_DEPTH)


solid = Compound([cut_extrude21_piece_1_1.part, cut_extrude21_piece_2_1.part])
